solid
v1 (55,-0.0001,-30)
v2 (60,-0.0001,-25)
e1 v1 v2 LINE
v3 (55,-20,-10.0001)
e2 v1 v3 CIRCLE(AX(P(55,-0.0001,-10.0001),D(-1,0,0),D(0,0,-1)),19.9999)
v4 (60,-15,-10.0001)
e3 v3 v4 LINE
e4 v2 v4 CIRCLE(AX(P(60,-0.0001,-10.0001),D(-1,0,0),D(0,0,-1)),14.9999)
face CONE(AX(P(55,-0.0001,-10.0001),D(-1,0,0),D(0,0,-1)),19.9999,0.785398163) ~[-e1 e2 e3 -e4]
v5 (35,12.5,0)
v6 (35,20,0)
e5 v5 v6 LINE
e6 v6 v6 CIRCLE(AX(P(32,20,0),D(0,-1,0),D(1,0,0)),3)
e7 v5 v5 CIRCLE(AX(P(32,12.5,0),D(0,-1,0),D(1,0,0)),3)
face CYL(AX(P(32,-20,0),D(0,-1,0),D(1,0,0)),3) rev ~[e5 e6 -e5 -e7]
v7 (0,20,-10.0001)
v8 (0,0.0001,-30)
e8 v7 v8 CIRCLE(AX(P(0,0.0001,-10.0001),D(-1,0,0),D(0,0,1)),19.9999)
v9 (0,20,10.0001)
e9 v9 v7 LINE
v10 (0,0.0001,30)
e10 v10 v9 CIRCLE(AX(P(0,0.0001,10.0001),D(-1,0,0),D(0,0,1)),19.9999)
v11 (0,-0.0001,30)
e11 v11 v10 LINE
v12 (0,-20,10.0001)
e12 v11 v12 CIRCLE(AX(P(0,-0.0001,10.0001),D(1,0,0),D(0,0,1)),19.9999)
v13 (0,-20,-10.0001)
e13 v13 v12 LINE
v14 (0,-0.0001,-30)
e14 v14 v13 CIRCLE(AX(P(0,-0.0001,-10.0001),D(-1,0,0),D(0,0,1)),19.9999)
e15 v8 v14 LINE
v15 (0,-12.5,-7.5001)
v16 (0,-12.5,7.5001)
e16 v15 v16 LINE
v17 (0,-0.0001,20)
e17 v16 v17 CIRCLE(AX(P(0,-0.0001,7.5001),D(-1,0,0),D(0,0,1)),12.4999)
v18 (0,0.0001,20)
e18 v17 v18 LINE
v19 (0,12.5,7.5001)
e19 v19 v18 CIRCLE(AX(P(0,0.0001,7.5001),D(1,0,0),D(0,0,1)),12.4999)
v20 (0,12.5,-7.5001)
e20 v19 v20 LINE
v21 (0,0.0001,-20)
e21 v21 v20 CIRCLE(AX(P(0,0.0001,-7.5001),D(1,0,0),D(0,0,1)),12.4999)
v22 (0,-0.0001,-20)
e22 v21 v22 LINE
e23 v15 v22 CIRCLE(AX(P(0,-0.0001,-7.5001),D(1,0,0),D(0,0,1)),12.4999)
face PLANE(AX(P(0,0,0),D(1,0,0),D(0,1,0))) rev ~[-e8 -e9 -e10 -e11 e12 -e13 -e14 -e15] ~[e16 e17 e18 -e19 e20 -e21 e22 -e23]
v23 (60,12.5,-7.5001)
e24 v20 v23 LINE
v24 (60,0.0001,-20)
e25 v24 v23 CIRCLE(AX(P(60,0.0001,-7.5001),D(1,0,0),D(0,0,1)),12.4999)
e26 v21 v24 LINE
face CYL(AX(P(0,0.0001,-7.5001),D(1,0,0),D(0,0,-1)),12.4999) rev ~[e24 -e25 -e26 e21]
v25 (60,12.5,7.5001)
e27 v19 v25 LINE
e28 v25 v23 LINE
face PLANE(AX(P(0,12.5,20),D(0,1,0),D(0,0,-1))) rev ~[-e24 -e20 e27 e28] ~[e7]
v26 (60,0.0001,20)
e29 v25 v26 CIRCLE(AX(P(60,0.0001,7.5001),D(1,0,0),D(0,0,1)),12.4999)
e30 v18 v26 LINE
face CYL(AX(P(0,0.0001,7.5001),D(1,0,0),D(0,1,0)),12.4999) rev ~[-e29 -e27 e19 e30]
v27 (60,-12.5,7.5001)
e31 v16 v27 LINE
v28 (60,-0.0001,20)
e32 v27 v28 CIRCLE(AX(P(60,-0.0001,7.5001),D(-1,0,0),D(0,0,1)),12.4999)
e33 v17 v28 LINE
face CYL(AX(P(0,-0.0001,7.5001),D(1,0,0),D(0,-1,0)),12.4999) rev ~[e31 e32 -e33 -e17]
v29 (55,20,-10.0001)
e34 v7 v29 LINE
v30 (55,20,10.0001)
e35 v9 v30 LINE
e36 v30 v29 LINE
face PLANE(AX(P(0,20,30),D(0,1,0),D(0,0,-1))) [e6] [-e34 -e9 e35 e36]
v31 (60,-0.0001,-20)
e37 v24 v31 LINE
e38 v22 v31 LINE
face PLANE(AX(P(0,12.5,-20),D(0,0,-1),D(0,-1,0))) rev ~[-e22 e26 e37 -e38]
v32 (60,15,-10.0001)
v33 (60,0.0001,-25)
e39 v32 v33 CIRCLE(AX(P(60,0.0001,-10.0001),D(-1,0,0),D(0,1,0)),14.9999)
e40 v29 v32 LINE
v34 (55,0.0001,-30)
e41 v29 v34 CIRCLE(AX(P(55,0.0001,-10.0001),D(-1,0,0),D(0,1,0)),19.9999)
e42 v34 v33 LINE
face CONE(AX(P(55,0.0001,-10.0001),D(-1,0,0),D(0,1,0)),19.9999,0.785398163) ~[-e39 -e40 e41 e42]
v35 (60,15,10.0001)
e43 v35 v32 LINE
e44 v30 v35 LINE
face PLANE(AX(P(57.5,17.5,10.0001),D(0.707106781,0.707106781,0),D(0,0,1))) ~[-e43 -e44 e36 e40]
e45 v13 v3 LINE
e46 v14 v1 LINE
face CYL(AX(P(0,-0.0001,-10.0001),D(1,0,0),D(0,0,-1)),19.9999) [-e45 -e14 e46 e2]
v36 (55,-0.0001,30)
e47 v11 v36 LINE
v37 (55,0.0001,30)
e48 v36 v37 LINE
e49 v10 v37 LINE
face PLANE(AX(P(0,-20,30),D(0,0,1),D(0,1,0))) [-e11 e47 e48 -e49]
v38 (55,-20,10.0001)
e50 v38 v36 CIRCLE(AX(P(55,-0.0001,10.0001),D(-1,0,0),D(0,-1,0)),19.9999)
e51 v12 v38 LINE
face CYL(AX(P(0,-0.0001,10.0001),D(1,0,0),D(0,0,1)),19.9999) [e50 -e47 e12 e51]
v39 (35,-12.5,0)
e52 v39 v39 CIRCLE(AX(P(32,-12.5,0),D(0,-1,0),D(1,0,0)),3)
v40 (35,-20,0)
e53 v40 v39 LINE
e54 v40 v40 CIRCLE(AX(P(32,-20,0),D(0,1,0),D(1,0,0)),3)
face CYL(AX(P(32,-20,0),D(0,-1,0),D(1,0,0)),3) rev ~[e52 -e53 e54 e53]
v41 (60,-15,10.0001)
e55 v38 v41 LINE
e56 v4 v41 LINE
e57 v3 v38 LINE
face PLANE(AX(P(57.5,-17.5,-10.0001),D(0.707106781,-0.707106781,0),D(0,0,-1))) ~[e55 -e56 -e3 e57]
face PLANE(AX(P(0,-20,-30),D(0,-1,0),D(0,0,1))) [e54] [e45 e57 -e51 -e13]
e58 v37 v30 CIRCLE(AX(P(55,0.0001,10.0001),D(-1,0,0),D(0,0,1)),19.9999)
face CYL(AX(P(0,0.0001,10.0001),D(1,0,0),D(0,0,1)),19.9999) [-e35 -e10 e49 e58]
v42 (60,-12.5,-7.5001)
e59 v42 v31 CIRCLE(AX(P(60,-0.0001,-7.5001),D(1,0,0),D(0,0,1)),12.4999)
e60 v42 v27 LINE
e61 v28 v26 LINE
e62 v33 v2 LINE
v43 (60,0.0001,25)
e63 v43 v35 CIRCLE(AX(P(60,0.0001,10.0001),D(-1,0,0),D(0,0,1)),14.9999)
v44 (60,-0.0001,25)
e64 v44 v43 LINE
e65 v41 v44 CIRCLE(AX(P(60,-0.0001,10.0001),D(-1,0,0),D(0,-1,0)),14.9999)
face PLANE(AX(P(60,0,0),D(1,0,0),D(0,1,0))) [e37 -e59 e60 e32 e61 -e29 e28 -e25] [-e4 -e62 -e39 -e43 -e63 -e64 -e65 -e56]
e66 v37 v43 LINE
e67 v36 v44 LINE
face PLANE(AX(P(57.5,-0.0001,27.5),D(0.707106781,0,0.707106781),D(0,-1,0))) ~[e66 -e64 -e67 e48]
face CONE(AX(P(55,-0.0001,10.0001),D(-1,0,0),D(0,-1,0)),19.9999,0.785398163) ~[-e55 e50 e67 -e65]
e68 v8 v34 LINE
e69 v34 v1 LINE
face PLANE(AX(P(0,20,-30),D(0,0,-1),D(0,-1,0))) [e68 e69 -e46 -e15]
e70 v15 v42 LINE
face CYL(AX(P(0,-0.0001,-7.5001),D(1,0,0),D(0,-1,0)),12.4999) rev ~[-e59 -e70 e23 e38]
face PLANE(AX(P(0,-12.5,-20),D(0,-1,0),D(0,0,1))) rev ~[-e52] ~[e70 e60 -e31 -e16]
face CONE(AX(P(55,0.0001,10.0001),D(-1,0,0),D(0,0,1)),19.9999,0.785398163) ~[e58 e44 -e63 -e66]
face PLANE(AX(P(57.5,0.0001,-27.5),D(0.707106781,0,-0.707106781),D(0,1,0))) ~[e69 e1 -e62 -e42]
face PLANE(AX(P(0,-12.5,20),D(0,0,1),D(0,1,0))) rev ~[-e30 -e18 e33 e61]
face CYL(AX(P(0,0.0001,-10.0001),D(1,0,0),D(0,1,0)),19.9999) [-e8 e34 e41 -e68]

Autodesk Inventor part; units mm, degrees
ref_plane "YZ Plane" through (0, 0, 0) normal (1, 0, 0) x (0, 1, 0)
ref_plane "XZ Plane" through (0, 0, 0) normal (0, 1, 0) x (-1, 0, 0)
ref_plane "XY Plane" through (0, 0, 0) normal (0, 0, 1) x (1, 0, 0)
sketch "草圖1" plane through (0, 0, 0) normal (1, 0, 0) x (0, 1, 0)
  line L0 (-20, 30) -> (20, 30)
  line L1 (20, 30) -> (20, -30)
  line L2 (20, -30) -> (-20, -30)
  line L3 (-20, -30) -> (-20, 30)
  line L4 (-20, 30) -> (20, -30) construction
  line L5 (20, 30) -> (-20, -30) construction
  line L6 (-12.5, 20) -> (12.5, 20)
  line L7 (12.5, 20) -> (12.5, -20)
  line L8 (12.5, -20) -> (-12.5, -20)
  line L9 (-12.5, -20) -> (-12.5, 20)
  line L10 (-12.5, 20) -> (12.5, -20) construction
  line L11 (12.5, 20) -> (-12.5, -20) construction
  point P0 (0, 0)
  dimension "d0" = 40
  dimension "d1" = 60
  dimension "d2" = 25
  dimension "d3" = 40
extrude "擠出1" add sketch "草圖1" along normal blind 60
fillet "圓角1" radius 20 4 edges at (30, 20, 30) (30, -20, 30) (30, 20, -30) (30, -20, -30)
fillet "圓角2" radius 12.5 4 edges at (30, 12.5, 20) (30, -12.5, 20) (30, -12.5, -20) (30, 12.5, -20)
chamfer "倒角1" distance 5 angle 45 4 edges at (60, 14.1422, -24.1422) (60, -20, 0) (60, 14.1422, 24.1422) (60, 20, 0)
sketch "草圖2" plane through (0, -20, -10) normal (0, -1, 0) x (1, 0, 0)
  line L0 (-12, 10) -> (72, 10) projected
  line L1 (0, -32) -> (0, 52) projected
  line L2 (60, 0) -> (60, 20) projected
  line L3 (32, 0) -> (32, 20)
  circle A0 centre (32, 10) radius 3
  point P0 (0, 10)
  dimension "d11" = 28
  dimension "d12" = 6
extrude "擠出2" cut sketch "草圖2" against normal blind 157.75
properties part number "exercise3-8"
